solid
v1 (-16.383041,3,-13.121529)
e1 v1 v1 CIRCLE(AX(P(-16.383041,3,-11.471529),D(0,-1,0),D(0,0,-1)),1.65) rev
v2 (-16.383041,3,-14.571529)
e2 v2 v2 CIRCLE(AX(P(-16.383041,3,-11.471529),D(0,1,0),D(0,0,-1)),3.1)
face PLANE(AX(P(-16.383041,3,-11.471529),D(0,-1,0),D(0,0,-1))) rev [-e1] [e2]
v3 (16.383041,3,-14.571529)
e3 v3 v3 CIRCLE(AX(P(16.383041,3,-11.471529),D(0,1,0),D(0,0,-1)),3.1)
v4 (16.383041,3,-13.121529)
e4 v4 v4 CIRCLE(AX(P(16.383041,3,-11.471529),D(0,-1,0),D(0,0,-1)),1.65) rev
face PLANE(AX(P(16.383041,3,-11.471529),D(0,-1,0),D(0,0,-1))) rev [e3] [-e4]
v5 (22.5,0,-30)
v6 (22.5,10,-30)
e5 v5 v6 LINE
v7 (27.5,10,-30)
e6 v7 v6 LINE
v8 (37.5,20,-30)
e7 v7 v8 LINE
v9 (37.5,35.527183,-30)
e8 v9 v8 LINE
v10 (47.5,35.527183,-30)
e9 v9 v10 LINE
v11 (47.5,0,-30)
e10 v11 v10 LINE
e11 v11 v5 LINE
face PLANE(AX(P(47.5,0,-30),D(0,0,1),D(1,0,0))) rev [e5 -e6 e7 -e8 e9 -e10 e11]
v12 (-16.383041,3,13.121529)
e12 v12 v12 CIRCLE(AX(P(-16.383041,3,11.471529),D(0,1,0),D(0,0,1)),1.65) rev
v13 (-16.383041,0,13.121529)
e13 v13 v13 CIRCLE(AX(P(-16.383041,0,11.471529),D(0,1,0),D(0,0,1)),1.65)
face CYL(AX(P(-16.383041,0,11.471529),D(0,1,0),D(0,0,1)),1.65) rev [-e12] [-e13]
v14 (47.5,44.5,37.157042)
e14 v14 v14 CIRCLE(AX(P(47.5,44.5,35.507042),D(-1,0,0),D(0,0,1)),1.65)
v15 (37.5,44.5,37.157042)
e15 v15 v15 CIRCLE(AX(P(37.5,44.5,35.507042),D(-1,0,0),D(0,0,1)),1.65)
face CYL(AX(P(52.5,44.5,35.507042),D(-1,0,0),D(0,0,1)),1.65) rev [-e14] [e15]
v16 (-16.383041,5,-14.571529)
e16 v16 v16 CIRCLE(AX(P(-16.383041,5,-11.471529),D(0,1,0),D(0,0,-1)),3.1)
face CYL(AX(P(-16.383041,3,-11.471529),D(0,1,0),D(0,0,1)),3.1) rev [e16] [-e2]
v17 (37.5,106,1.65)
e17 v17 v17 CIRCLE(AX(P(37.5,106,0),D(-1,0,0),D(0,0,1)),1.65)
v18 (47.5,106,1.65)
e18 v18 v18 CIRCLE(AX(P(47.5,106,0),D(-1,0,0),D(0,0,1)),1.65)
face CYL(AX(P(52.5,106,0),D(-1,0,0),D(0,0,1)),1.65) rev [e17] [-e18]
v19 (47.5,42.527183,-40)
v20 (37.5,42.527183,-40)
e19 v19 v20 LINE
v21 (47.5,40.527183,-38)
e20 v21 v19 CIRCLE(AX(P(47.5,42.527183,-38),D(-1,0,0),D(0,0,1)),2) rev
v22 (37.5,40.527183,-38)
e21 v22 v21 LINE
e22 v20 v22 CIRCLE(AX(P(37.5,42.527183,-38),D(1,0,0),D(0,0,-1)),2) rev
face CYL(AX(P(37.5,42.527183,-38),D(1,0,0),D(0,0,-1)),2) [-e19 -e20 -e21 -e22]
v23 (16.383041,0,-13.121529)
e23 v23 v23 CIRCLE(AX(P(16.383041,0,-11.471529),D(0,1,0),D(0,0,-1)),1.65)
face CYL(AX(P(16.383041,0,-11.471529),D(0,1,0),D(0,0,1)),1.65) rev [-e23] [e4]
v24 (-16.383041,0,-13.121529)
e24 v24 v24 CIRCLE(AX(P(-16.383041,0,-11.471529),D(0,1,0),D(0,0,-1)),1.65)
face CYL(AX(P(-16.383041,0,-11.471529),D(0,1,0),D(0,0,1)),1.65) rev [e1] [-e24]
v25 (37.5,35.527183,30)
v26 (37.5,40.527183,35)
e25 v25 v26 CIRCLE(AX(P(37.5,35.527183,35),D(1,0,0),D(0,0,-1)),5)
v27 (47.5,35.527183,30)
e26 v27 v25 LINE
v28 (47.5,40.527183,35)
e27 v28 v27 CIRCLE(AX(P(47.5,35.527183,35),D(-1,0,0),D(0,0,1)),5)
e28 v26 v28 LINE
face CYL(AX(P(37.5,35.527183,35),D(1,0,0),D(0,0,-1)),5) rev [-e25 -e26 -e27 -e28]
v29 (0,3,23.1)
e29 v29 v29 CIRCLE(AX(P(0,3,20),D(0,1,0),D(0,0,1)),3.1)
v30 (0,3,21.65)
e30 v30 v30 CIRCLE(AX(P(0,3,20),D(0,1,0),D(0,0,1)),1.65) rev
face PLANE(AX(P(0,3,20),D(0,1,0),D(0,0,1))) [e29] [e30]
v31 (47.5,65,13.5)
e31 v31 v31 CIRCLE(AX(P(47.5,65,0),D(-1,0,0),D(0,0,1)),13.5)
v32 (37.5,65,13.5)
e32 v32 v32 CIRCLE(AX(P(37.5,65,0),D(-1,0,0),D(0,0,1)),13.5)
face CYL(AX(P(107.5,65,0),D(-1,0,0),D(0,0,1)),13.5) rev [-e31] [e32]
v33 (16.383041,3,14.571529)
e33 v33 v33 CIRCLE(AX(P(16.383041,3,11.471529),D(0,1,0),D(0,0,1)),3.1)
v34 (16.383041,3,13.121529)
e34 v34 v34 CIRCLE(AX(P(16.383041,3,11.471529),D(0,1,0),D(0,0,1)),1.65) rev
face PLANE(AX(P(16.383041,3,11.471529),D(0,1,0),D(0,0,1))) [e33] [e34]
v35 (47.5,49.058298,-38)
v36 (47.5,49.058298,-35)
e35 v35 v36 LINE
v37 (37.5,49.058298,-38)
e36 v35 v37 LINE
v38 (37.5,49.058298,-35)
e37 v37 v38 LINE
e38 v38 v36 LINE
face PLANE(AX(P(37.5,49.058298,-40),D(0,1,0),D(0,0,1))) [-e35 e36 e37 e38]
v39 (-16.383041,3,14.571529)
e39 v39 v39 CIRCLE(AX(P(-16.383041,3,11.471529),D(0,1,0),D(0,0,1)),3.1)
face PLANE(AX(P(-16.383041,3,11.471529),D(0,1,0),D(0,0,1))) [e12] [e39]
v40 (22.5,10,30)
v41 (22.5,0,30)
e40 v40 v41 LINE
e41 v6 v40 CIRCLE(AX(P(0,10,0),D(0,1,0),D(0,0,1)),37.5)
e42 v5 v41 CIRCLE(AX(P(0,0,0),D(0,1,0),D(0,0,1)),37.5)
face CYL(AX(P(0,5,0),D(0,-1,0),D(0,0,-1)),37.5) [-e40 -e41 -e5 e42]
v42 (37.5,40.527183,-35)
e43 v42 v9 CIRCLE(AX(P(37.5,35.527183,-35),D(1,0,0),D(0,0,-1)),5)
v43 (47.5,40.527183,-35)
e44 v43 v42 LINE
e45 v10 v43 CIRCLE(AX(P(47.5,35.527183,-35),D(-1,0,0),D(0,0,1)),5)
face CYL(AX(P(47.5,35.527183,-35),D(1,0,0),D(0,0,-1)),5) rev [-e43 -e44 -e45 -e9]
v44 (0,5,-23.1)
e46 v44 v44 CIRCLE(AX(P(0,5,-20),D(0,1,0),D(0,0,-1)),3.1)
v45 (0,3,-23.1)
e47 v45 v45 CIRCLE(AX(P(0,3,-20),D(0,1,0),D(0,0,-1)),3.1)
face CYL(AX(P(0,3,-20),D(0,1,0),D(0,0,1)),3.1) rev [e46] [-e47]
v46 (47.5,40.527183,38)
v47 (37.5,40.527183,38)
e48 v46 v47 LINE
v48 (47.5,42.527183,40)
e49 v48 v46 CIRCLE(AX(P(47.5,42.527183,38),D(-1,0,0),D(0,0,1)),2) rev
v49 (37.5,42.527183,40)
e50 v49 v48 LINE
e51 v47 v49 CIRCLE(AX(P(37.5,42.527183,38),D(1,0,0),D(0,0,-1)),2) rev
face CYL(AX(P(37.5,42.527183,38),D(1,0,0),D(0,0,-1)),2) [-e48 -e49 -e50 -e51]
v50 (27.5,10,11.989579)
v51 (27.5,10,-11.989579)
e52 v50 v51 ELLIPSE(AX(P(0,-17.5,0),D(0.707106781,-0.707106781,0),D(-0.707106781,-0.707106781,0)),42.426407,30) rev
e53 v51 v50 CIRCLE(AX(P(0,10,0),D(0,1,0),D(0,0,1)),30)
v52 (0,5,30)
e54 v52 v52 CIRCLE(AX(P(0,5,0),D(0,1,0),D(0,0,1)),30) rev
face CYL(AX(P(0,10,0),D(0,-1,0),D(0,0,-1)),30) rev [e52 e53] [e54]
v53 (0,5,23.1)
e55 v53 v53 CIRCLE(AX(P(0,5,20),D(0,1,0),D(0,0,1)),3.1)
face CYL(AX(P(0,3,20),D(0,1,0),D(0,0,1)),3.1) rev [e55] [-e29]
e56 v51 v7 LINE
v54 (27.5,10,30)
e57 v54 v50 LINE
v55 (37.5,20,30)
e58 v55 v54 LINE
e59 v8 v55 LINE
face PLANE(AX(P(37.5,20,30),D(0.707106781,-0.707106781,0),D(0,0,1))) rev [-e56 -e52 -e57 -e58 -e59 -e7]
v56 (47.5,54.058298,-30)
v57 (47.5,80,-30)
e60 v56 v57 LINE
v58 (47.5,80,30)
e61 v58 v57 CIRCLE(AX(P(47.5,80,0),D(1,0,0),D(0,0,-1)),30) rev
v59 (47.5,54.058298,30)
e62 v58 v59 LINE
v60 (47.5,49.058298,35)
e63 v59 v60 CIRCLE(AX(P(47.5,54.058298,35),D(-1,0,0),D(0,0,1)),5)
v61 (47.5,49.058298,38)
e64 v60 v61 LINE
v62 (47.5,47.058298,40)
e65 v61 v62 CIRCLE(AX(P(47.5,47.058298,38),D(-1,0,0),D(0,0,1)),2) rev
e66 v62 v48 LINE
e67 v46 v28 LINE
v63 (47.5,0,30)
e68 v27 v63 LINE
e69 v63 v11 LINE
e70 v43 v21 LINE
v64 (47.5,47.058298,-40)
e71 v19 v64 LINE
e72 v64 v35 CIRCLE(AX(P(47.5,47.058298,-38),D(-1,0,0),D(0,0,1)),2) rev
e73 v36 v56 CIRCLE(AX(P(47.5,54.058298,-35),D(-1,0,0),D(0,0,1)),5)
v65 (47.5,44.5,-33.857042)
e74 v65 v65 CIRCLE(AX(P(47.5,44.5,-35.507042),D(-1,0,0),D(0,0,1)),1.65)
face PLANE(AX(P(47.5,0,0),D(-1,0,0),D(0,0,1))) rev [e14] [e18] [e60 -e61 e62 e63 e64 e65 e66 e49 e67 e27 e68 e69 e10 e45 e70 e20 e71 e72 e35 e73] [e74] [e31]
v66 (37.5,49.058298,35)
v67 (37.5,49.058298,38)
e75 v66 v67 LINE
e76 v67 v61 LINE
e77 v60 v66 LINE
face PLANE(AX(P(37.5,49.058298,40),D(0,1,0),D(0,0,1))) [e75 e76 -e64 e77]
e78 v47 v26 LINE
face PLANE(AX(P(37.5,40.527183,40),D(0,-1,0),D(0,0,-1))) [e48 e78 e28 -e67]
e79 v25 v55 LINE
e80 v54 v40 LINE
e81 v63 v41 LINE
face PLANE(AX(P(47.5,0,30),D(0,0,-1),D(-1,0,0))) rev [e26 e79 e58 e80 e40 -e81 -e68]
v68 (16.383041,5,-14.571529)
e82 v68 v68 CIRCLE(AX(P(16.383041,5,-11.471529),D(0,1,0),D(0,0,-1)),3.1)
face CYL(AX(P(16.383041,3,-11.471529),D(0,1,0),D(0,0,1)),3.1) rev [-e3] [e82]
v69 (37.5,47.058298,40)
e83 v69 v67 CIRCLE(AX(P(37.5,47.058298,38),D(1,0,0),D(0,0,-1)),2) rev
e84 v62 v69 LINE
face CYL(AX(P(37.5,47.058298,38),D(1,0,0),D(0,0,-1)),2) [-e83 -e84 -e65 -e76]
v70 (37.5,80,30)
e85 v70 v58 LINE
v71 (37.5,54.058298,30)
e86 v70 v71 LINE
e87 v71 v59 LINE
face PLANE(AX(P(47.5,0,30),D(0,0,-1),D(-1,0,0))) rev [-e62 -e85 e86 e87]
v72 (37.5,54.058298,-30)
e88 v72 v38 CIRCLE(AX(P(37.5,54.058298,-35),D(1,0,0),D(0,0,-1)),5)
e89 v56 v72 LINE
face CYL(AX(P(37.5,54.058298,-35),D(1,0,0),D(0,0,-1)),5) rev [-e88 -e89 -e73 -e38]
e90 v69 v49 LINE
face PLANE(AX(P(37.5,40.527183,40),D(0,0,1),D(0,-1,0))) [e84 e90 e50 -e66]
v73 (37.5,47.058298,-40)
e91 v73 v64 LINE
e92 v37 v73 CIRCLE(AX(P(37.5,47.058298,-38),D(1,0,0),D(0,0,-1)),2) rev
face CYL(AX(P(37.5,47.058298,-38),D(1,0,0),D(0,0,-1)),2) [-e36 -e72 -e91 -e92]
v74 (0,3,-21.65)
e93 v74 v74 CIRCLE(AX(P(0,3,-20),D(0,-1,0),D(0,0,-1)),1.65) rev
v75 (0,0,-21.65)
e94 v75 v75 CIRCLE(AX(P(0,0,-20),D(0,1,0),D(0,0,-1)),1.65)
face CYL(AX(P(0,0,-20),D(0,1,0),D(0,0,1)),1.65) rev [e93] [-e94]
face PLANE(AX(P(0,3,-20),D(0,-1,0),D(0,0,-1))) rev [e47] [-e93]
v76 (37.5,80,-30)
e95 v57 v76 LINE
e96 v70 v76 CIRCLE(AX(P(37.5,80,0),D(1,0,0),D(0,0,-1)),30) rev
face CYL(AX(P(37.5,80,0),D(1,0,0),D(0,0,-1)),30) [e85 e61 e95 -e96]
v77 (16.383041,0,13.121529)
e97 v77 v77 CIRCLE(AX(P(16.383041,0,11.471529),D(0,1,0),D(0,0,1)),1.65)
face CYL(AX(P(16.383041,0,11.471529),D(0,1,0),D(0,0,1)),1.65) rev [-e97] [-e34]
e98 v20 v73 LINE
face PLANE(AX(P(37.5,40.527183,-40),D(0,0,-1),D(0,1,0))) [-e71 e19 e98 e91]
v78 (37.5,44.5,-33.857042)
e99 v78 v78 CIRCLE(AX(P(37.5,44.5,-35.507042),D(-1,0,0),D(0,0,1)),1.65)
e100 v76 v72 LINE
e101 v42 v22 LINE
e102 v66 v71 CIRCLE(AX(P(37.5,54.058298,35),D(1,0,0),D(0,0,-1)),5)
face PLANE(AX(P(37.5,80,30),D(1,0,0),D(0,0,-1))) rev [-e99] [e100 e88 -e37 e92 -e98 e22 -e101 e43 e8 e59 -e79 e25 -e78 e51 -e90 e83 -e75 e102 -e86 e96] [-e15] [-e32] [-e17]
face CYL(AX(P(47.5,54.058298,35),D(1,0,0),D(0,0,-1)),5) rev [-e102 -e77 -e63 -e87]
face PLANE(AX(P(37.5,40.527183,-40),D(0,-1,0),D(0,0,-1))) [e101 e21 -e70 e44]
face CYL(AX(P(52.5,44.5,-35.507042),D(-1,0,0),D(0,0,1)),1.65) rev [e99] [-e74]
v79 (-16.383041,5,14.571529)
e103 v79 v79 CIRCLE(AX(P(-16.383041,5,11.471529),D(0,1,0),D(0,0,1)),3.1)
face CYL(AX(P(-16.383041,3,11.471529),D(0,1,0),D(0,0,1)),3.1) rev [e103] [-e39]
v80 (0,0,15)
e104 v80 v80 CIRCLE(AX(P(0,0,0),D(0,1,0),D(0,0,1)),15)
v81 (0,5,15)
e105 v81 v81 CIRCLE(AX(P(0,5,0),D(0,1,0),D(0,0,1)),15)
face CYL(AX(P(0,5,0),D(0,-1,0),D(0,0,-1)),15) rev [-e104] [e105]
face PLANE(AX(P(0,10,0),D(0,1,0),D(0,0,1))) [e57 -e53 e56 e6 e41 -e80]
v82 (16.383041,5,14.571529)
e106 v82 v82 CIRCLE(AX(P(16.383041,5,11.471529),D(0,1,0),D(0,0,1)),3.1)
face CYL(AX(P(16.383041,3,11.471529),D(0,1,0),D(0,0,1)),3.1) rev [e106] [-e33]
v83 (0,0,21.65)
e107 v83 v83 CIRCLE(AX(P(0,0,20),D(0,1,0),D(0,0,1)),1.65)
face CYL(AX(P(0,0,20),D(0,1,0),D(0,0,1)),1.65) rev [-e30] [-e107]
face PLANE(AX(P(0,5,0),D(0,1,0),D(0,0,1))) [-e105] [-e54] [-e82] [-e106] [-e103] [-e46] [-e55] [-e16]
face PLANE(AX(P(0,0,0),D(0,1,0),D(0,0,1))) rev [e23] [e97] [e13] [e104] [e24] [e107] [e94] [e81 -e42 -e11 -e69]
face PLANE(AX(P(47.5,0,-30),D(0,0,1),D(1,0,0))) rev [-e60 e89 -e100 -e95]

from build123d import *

# Parameters (mm, degrees)
SKETCH1_R           = 37.5
SKETCH1_R_2         = 15
BOSS_EXTRUDE1_DEPTH = 5
SKETCH2_R           = 37.5
SKETCH2_R_2         = 30
BOSS_EXTRUDE2_DEPTH = 5
SKETCH3_R           = 1.65
CUT_EXTRUDE1_DEPTH  = 54.268189382
SKETCH4_R           = 3.1
CUT_EXTRUDE2_DEPTH  = 2
BOSS_EXTRUDE3_DEPTH = 10
SKETCH6_W           = 10
SKETCH6_H           = 60
BOSS_EXTRUDE4_DEPTH = 70
SKETCH7_R           = 13.5
CUT_EXTRUDE3_DEPTH  = 70
BOSS_EXTRUDE6_DEPTH = 10
SKETCH12_W          = 10
SKETCH12_H          = 8.531115437
BOSS_EXTRUDE7_DEPTH = 10
FILLET2_R           = 5
SKETCH10_R          = 1.65
CUT_EXTRUDE5_DEPTH  = 15
CHAMFER1_SIZE       = 10
FILLET3_R           = 2


# Read off the part's stored shape, not the designer's step: Boss-Extrude3
with BuildPart() as part:
    # Sketch1 → Boss-Extrude1 (new body)
    with BuildSketch(Plane(origin=(0, 0, 0), x_dir=(1, 0, 0), z_dir=(0, 1, 0))):
        with Locations(Location((0, 0, 0), (0, 0, 270))):
            Circle(SKETCH1_R)
        with Locations(Location((0, 0, 0), (0, 0, 270))):
            Circle(SKETCH1_R_2, mode=Mode.SUBTRACT)
    extrude(amount=BOSS_EXTRUDE1_DEPTH)

    # Sketch2 → Boss-Extrude2 (add)
    with BuildSketch(Plane(origin=(0, 5, 0), x_dir=(1, 0, 0), z_dir=(0, 1, 0))):
        with Locations(Location((0, 0, 0), (0, 0, 270))):
            Circle(SKETCH2_R)
        with Locations(Location((0, 0, 0), (0, 0, 270))):
            Circle(SKETCH2_R_2, mode=Mode.SUBTRACT)
    extrude(amount=BOSS_EXTRUDE2_DEPTH)

    # Sketch3 → Cut-Extrude1 (cut, through all)
    with BuildSketch(Plane(origin=(0, 5, 0), x_dir=(1, 0, 0), z_dir=(0, 1, 0))):
        with Locations(Location((0, -20, 0), (0, 0, 270))):
            Circle(SKETCH3_R)
        with Locations(Location((16.383040886, -11.471528727, 0), (0, 0, 270))):
            Circle(SKETCH3_R)
        with Locations(Location((-16.383040886, -11.471528727, 0), (0, 0, 270))):
            Circle(SKETCH3_R)
        with Locations(Location((-16.383040886, 11.471528727, 0), (0, 0, 90))):
            Circle(SKETCH3_R)
        with Locations(Location((0, 20, 0), (0, 0, 90))):
            Circle(SKETCH3_R)
        with Locations(Location((16.383040886, 11.471528727, 0), (0, 0, 90))):
            Circle(SKETCH3_R)
    extrude(amount=-CUT_EXTRUDE1_DEPTH, mode=Mode.SUBTRACT)

    # Sketch4 → Cut-Extrude2 (cut)
    with BuildSketch(Plane(origin=(0, 5, 0), x_dir=(1, 0, 0), z_dir=(0, 1, 0))):
        with Locations(Location((0, -20, 0), (0, 0, 270))):
            Circle(SKETCH4_R)
        with Locations(Location((16.383040886, -11.471528727, 0), (0, 0, 270))):
            Circle(SKETCH4_R)
        with Locations(Location((-16.383040886, -11.471528727, 0), (0, 0, 270))):
            Circle(SKETCH4_R)
        with Locations(Location((-16.383040886, 11.471528727, 0), (0, 0, 90))):
            Circle(SKETCH4_R)
        with Locations(Location((16.383040886, 11.471528727, 0), (0, 0, 90))):
            Circle(SKETCH4_R)
        with Locations(Location((0, 20, 0), (0, 0, 90))):
            Circle(SKETCH4_R)
    extrude(amount=-CUT_EXTRUDE2_DEPTH, mode=Mode.SUBTRACT)

    # Boss-Extrude3 outline → Boss-Extrude3 (add)
    with BuildSketch(Plane(origin=(0, 0, 0), x_dir=(1, 0, 0), z_dir=(0, 1, 0))):
        with BuildLine():
            Line((22.5, -30), (47.5, -30))
            Line((47.5, -30), (47.5, 30))
            Line((47.5, 30), (22.5, 30))
            ThreePointArc((22.5, 30), (37.5, 0), (22.5, -30))
        make_face()
    extrude(amount=BOSS_EXTRUDE3_DEPTH)

    # Sketch6 → Boss-Extrude4 (add)
    with BuildSketch(Plane(origin=(0, 10, 0), x_dir=(1, 0, 0), z_dir=(0, 1, 0))):
        with Locations((42.5, 0)):
            Rectangle(SKETCH6_W, SKETCH6_H)
    extrude(amount=BOSS_EXTRUDE4_DEPTH)

    # Sketch7 → Cut-Extrude3 (cut)
    with BuildSketch(Plane.ZY.offset(-37.5)):
        with Locations((0, 65)):
            Circle(SKETCH7_R)
    extrude(amount=-CUT_EXTRUDE3_DEPTH, mode=Mode.SUBTRACT)

    # Sketch9 → Boss-Extrude6 (add)
    with BuildSketch(Plane(origin=(47.5, 0, 0), x_dir=(0, 0, -1), z_dir=(1, 0, 0))):
        with BuildLine():
            ThreePointArc((-30, 80), (0, 110), (30, 80))
            Line((30, 80), (-30, 80))
        make_face()
    extrude(amount=-BOSS_EXTRUDE6_DEPTH)

    # Sketch12 → Boss-Extrude7 (add)
    with BuildSketch(Plane(origin=(47.5, 0, 0), x_dir=(0, 0, -1), z_dir=(1, 0, 0))):
        with Locations((-35, 44.792740579)):
            Rectangle(SKETCH12_W, SKETCH12_H)
        with Locations((35, 44.792740579)):
            Rectangle(SKETCH12_W, SKETCH12_H)
    extrude(amount=-BOSS_EXTRUDE7_DEPTH)

    # Fillet2
    fillet2_edges = [part.edges().sort_by_distance(p)[0] for p in [
        (42.5, 49.058298297, 30),
        (42.5, 40.52718286, 30),
        (42.5, 40.52718286, -30),
        (42.5, 49.058298297, -30),
    ]]
    fillet(fillet2_edges, radius=FILLET2_R)

    # Sketch10 → Cut-Extrude5 (cut)
    with BuildSketch(Plane.ZY.offset(-37.5)):
        with Locations((0, 106)):
            Circle(SKETCH10_R)
        with Locations((35.507041555, 44.5)):
            Circle(SKETCH10_R)
        with Locations((-35.507041555, 44.5)):
            Circle(SKETCH10_R)
    extrude(amount=-CUT_EXTRUDE5_DEPTH, mode=Mode.SUBTRACT)

    # Chamfer1
    # the kernel refuses this chamfer: 10 mm, written as the material it adds along each edge
    with BuildSketch(Plane(origin=(37.5, 10, 30), x_dir=(0.027495876610586317, 0.9996219169112968, 0), z_dir=(0, 0, -1))) as chamfer1_piece_1_section:
        Polygon((CHAMFER1_SIZE * 0.999621916911, -CHAMFER1_SIZE * 0.0274958766106), (-CHAMFER1_SIZE * 0.0274958766106, -CHAMFER1_SIZE * 0.999621916911), (0, 0), align=None)
    chamfer1_piece_1 = extrude(amount=60, mode=Mode.PRIVATE)
    chamfer1_piece_1 = chamfer1_piece_1 - Plane(origin=(0, 13.349530392, 0), x_dir=(0, 0, 1), z_dir=(0, -1, 0)) * Cylinder(30, 160, mode=Mode.PRIVATE)
    add(chamfer1_piece_1)

    # Fillet3
    fillet3_edges = [part.edges().sort_by_distance(p)[0] for p in [
        (42.5, 40.52718286, 40),
        (42.5, 49.058298297, 40),
        (42.5, 49.058298297, -40),
        (42.5, 40.52718286, -40),
    ]]
    fillet(fillet3_edges, radius=FILLET3_R)


solid = part.part
